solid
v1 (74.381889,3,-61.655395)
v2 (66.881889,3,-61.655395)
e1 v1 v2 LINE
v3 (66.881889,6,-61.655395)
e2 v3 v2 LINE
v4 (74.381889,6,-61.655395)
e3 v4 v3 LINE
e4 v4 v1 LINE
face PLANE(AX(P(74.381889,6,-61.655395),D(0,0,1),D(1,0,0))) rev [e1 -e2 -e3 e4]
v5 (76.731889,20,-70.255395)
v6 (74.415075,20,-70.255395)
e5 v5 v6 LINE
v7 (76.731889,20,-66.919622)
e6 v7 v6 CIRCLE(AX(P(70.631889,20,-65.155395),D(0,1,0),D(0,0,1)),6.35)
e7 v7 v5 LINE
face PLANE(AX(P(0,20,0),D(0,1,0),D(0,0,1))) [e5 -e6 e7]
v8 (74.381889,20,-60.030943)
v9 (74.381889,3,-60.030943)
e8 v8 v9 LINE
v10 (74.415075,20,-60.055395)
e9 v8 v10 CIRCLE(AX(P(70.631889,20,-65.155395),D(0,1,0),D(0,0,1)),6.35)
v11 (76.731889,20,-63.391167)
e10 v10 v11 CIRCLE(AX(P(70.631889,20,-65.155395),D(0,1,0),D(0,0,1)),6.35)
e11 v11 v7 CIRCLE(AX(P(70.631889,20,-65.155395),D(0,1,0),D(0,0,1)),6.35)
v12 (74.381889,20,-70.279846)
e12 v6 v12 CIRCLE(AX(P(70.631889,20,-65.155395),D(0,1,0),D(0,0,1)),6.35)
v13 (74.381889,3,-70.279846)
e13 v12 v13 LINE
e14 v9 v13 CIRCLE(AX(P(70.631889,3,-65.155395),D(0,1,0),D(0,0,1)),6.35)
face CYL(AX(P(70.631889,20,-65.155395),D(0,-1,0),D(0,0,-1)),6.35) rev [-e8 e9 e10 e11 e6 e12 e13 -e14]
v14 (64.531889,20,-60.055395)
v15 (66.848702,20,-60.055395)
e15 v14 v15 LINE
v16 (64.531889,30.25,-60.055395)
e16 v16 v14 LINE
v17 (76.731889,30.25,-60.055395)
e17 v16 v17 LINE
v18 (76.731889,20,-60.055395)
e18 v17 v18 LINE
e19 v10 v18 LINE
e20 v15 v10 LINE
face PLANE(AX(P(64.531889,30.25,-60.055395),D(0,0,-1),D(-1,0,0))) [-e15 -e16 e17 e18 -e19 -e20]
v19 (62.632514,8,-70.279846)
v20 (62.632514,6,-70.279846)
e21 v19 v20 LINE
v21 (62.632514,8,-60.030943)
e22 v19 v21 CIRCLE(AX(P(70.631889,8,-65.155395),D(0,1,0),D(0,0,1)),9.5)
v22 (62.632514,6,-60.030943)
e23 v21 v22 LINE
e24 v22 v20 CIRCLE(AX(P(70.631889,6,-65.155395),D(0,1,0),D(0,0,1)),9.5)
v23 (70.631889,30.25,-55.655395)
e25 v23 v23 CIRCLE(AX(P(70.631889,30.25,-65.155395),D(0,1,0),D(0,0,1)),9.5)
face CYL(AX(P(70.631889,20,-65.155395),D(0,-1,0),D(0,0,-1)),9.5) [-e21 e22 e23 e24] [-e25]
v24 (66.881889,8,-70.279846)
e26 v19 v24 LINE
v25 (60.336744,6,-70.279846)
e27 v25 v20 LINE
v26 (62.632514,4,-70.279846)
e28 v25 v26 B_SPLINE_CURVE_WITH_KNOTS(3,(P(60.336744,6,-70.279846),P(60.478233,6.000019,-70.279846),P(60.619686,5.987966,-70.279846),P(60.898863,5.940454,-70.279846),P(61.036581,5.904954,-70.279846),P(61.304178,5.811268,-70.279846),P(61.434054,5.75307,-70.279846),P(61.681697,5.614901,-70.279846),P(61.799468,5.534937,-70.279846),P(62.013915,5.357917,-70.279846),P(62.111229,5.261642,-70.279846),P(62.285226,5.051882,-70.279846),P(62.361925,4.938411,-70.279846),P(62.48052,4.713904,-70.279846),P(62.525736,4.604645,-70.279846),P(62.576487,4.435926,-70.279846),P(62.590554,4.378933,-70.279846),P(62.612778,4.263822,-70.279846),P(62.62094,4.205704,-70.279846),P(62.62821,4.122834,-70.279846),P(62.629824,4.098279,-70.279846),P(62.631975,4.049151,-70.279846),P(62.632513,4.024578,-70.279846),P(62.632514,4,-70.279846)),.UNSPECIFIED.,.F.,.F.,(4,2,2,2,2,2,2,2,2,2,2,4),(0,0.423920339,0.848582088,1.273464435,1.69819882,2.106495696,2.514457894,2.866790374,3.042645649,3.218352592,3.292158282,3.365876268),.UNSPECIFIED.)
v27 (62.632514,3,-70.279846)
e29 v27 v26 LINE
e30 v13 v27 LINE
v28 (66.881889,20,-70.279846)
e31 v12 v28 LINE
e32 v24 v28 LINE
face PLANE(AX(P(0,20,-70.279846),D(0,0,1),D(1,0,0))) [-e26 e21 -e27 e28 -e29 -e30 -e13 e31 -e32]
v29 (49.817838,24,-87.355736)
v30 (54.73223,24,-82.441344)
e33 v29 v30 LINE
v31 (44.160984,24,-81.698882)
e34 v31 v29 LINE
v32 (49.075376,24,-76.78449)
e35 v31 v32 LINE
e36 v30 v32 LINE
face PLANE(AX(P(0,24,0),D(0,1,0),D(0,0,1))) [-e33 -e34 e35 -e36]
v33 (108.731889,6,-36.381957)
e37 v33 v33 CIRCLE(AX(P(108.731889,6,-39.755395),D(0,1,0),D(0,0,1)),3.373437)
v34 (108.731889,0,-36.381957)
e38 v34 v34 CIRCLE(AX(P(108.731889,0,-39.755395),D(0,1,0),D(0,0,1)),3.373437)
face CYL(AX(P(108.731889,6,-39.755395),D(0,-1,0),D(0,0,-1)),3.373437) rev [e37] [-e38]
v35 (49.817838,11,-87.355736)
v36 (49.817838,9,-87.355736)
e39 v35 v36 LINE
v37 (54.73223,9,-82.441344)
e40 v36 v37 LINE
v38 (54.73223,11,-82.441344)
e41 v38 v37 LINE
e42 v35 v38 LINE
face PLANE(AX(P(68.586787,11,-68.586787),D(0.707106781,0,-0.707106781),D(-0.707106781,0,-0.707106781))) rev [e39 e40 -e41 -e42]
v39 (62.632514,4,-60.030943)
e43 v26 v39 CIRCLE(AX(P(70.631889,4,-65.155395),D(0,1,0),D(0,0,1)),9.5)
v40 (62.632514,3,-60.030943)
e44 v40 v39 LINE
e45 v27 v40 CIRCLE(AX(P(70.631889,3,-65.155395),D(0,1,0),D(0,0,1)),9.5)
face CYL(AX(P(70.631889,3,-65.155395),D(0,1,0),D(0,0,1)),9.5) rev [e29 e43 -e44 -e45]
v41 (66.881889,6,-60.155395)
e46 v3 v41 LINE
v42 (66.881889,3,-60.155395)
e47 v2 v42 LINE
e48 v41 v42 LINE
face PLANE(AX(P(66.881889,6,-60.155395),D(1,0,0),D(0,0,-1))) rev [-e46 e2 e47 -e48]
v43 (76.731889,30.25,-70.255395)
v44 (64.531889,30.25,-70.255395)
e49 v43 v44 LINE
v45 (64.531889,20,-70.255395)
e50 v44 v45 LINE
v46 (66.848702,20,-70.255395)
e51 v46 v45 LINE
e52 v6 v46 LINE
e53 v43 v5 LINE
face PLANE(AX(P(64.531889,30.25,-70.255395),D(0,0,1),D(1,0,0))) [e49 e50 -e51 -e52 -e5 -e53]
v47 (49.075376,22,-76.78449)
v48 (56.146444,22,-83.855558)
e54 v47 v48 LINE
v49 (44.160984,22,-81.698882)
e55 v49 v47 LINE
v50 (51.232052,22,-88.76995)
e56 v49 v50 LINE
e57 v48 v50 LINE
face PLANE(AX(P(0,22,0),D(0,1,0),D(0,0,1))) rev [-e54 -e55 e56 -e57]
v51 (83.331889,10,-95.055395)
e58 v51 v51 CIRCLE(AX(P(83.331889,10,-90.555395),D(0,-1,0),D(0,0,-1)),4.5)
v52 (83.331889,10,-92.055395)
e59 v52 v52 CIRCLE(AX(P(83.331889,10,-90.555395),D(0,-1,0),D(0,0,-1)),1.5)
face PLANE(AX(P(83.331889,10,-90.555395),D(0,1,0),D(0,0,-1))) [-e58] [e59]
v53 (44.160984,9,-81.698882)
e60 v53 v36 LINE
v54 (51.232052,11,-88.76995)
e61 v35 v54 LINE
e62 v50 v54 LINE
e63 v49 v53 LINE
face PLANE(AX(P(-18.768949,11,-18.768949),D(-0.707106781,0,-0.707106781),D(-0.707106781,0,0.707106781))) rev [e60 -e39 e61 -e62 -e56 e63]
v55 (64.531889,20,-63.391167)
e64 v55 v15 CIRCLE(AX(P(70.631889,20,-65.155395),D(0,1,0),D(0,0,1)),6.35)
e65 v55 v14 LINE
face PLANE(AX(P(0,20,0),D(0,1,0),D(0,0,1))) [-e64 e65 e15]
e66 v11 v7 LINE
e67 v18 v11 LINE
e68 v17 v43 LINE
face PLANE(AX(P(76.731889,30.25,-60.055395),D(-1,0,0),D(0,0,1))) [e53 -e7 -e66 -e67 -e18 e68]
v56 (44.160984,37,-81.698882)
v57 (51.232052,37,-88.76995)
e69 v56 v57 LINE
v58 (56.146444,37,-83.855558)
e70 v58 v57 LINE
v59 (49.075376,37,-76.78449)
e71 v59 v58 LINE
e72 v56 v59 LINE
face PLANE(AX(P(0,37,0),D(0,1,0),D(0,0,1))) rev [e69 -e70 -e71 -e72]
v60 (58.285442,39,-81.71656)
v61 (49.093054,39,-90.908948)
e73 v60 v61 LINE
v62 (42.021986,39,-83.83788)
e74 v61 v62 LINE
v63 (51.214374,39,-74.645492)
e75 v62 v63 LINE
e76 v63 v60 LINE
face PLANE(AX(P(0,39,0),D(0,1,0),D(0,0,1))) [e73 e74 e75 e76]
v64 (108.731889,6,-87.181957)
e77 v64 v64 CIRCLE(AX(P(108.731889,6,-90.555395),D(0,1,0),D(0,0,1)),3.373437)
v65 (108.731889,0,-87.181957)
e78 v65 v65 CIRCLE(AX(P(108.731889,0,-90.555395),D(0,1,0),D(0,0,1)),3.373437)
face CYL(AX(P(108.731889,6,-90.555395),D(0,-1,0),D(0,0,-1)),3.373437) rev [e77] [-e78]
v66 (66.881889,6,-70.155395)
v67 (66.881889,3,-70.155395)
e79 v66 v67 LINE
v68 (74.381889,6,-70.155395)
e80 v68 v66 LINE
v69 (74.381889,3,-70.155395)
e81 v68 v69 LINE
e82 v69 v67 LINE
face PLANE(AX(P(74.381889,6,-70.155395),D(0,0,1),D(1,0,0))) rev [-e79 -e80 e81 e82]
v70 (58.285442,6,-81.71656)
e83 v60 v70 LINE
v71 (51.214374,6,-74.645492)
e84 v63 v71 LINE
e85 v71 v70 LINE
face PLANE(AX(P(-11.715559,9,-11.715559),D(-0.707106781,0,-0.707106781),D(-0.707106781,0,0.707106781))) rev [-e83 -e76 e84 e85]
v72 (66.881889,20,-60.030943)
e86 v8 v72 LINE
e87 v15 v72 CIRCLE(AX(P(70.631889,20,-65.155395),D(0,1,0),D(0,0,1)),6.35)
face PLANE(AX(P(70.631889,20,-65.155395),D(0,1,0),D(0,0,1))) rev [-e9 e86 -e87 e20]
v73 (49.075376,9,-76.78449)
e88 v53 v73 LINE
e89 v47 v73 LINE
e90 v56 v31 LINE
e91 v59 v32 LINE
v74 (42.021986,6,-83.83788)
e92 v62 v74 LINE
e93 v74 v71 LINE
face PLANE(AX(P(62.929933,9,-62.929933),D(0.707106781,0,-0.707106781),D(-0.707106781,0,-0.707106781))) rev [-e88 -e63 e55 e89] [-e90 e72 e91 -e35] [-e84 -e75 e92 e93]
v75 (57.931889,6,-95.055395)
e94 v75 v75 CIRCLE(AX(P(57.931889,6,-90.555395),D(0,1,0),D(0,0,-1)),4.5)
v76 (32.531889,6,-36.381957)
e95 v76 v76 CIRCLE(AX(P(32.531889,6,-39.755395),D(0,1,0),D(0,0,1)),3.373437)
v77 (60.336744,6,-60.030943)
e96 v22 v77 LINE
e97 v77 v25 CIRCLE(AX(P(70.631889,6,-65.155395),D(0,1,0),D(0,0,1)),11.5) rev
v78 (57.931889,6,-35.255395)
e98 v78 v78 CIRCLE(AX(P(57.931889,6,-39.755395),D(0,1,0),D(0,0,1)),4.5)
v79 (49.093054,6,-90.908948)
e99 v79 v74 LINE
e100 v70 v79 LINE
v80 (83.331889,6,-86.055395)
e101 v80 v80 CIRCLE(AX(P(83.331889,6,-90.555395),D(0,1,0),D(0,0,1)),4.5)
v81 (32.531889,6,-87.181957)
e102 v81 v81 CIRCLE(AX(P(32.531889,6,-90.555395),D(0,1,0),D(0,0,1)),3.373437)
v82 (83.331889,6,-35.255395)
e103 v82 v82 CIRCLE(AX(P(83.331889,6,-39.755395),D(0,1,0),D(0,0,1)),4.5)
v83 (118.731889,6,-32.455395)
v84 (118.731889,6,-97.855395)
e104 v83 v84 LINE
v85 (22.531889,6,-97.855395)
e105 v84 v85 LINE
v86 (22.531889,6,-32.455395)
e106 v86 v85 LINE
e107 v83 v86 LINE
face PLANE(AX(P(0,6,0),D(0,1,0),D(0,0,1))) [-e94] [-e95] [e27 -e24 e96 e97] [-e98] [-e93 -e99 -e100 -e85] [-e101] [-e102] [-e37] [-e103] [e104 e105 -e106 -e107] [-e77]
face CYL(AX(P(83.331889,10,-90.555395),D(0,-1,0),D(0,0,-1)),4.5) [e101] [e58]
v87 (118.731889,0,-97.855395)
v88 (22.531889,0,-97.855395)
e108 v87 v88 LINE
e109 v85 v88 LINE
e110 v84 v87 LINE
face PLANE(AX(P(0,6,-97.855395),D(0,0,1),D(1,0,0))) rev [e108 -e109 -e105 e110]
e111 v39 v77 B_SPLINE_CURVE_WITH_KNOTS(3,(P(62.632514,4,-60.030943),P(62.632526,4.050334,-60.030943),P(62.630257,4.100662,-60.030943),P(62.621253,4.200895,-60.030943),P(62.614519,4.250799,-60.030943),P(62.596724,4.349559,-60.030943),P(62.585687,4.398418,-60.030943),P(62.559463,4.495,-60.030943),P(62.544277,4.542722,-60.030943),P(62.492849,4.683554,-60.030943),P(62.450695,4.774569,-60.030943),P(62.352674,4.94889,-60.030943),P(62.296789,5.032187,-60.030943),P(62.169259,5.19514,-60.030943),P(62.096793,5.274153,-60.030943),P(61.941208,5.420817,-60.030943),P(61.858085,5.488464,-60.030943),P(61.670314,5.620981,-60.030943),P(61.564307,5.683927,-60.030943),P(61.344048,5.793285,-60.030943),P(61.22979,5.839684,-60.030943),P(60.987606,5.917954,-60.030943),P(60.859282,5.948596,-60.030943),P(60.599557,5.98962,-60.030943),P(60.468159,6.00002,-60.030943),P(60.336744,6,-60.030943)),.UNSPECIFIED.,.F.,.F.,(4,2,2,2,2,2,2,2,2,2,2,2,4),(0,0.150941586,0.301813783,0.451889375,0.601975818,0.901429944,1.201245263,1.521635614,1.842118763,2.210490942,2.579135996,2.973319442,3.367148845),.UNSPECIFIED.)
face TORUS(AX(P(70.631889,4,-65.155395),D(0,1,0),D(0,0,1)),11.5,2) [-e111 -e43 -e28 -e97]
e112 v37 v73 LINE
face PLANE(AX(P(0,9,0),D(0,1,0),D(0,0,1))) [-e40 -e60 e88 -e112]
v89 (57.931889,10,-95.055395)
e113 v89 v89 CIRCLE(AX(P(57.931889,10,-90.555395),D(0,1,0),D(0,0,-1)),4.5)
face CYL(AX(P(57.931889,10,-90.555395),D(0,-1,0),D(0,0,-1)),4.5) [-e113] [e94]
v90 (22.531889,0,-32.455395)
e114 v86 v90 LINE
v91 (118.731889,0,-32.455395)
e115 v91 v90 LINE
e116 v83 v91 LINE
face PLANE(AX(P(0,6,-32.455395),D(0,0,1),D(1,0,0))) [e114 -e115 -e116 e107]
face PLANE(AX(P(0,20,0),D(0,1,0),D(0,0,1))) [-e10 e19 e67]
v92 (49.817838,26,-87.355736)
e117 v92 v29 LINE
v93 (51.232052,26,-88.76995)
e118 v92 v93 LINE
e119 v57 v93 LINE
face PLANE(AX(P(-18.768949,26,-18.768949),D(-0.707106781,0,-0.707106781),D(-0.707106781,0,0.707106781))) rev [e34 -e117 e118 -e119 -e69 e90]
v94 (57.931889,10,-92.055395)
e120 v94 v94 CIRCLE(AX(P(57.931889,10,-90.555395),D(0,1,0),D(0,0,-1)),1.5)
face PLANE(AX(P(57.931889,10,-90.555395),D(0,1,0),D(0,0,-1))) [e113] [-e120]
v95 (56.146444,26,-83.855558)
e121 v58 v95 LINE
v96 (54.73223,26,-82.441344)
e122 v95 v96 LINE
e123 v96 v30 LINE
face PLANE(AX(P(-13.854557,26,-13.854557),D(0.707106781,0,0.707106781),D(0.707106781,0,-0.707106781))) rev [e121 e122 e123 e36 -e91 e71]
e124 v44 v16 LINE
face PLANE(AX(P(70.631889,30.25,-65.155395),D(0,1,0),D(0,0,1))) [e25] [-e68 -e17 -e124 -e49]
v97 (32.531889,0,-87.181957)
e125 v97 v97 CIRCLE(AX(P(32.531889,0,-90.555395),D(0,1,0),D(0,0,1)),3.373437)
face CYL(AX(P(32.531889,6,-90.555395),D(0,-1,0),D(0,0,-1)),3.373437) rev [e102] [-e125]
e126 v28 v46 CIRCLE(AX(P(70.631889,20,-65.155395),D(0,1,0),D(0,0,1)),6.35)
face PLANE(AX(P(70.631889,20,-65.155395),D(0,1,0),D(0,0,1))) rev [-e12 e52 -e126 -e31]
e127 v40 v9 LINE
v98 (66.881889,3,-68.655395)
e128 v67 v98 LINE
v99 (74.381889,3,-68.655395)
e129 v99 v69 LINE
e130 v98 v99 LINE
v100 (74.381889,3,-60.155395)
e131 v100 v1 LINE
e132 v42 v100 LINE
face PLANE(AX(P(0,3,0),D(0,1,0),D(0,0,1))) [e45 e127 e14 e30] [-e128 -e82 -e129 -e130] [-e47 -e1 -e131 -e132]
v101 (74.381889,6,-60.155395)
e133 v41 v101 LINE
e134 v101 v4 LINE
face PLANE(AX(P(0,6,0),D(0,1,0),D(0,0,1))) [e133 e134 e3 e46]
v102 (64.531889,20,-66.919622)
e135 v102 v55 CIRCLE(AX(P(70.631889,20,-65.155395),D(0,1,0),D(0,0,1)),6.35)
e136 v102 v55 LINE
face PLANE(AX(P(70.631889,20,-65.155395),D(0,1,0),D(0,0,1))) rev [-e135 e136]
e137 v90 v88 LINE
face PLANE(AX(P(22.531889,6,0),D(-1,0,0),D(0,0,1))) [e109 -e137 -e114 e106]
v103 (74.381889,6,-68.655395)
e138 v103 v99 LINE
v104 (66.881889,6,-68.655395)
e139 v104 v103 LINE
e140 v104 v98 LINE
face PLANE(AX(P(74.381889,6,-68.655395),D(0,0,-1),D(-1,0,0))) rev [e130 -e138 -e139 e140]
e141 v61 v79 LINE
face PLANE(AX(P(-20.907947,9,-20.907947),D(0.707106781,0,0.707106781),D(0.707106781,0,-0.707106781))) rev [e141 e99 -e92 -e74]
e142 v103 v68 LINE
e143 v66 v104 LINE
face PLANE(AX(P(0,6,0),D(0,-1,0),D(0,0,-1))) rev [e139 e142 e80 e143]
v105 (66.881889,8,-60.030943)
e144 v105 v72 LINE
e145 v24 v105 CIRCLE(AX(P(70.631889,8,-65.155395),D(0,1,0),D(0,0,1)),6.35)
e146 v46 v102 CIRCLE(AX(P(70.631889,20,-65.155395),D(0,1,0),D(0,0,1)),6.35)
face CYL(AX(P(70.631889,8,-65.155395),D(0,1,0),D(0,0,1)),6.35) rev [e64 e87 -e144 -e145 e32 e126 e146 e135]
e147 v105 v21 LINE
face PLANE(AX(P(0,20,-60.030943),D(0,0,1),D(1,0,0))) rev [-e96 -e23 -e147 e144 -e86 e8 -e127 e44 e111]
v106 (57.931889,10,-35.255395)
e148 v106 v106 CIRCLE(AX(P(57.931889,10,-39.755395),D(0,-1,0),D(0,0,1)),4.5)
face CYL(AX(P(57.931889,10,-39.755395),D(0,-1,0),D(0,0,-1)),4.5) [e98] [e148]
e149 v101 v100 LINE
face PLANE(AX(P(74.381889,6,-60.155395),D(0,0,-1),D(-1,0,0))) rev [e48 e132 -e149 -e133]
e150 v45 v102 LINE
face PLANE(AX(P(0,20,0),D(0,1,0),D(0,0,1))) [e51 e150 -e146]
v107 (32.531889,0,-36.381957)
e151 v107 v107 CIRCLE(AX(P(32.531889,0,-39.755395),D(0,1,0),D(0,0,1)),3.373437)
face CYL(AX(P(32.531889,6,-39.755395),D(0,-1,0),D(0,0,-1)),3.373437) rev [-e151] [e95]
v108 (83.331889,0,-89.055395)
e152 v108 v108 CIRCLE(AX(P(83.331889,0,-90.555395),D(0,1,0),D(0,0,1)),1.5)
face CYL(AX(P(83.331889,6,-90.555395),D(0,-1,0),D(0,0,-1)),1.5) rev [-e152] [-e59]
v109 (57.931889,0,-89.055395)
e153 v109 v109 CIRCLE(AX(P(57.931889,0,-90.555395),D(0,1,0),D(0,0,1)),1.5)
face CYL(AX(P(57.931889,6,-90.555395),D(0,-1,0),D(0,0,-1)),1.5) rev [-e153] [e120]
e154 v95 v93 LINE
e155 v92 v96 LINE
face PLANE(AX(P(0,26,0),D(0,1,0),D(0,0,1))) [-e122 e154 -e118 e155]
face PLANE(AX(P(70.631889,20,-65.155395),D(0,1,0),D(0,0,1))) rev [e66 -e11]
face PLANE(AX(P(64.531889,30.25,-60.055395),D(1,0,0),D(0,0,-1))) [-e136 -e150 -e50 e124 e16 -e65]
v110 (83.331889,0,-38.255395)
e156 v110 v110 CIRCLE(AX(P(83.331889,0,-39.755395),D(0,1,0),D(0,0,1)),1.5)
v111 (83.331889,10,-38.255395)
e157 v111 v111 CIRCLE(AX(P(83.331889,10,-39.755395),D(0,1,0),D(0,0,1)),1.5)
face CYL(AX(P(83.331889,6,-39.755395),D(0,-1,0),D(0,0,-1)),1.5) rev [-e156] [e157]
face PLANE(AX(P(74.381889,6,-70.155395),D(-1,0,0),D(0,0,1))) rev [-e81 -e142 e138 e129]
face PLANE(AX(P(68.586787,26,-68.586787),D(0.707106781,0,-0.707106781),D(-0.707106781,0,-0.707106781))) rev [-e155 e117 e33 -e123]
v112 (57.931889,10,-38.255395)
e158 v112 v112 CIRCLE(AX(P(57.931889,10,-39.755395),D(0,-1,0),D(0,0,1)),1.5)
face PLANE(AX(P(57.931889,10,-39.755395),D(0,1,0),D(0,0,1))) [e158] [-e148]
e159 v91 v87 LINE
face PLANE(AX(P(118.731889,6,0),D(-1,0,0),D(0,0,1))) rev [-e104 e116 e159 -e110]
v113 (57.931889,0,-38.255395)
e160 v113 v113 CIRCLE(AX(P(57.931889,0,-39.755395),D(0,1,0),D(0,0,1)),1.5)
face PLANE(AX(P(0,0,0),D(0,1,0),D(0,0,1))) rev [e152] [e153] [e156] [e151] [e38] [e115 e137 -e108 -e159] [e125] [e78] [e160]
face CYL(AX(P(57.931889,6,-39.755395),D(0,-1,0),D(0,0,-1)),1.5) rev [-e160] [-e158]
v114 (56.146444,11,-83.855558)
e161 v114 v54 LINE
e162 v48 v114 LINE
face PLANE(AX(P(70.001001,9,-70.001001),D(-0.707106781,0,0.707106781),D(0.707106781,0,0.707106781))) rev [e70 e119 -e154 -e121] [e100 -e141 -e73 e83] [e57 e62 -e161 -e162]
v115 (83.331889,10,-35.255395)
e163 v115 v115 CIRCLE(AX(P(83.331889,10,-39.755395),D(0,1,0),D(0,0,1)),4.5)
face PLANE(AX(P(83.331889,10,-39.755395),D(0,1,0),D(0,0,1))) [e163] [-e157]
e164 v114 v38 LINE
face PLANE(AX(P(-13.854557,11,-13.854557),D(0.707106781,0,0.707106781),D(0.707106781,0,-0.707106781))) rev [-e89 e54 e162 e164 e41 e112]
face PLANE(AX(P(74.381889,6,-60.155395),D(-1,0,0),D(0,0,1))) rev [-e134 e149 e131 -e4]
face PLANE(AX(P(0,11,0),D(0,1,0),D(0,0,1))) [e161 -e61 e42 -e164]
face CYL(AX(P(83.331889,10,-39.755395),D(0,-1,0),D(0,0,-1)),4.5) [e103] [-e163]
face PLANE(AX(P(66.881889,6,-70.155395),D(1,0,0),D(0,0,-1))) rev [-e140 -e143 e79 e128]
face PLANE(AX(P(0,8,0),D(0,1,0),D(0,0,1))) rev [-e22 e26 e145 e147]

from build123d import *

# Parameters (mm, degrees)
SKETCH2_R                 = 1.5000000000000042
SKETCH2_R_2               = 1.4999999999999973
SKETCH2_R_3               = 3.37343749999996
BOSS_EXTRUDE1_DEPTH       = 6
SKETCH3_R                 = 4.500000000000005
SKETCH3_R_2               = 1.4999999999999973
BOSS_EXTRUDE2_DEPTH       = 4
MIRROR2_COPY_1_SKETCH_R   = 4.500000000000005
MIRROR2_COPY_1_SKETCH_R_2 = 1.4999999999999973
MIRROR2_COPY_1_DEPTH      = 4
BOSS_EXTRUDE3_DEPTH       = 14
CUT_EXTRUDE2_START        = -3
CUT_EXTRUDE2_DEPTH        = 3
SKETCH8_W                 = 7.5
SKETCH8_H                 = 1.5
BOSS_EXTRUDE4_DEPTH       = 3
BOSS_EXTRUDE5_START       = -12.000000000000004
BOSS_EXTRUDE5_DEPTH       = 12.000000000000004
SKETCH10_R                = 9.499999999999993
SKETCH10_W                = 12.200000000000003
SKETCH10_H                = 10.200000000000003
BOSS_EXTRUDE6_DEPTH       = 10.25
FILLET1_R                 = 2
BOSS_EXTRUDE7_DEPTH       = 3
BOSS_EXTRUDE8_DEPTH       = 2
BOSS_EXTRUDE9_DEPTH       = 11
BOSS_EXTRUDE10_DEPTH      = 2
BOSS_EXTRUDE11_DEPTH      = 2
BOSS_EXTRUDE12_DEPTH      = 11
BOSS_EXTRUDE13_DEPTH      = 2


with BuildPart() as part:
    # Sketch2 → Boss-Extrude1 (new body)
    with BuildSketch(Plane(origin=(0, 0, 0), x_dir=(1, 0, 0), z_dir=(0, 1, 0))):
        Polygon((118.7318886716207, 32.455394598369764), (118.73188867162068, 97.85539459836978), (22.531888671620678, 97.85539459836976), (22.5318886716207, 32.45539459836975), align=None)
        with Locations(Location((57.93188867162069, 39.75539459836976, 0), (0, 0, 270))):
            Circle(SKETCH2_R, mode=Mode.SUBTRACT)
        with Locations(Location((83.3318886716207, 39.75539459836976, 0), (0, 0, 270))):
            Circle(SKETCH2_R_2, mode=Mode.SUBTRACT)
        with Locations(Location((57.931888671620705, 90.55539459836976, 0), (0, 0, 270))):
            Circle(SKETCH2_R_2, mode=Mode.SUBTRACT)
        with Locations(Location((83.3318886716207, 90.55539459836974, 0), (0, 0, 270))):
            Circle(SKETCH2_R_2, mode=Mode.SUBTRACT)
        with Locations(Location((108.7318886716207, 90.55539459836974, 0), (0, 0, 270))):
            Circle(SKETCH2_R_3, mode=Mode.SUBTRACT)
        with Locations(Location((108.73188867162068, 39.755394598369776, 0), (0, 0, 270))):
            Circle(SKETCH2_R_3, mode=Mode.SUBTRACT)
        with Locations(Location((32.53188867162068, 90.55539459836974, 0), (0, 0, 270))):
            Circle(SKETCH2_R_3, mode=Mode.SUBTRACT)
        with Locations(Location((32.53188867162071, 39.755394598369755, 0), (0, 0, 270))):
            Circle(SKETCH2_R_3, mode=Mode.SUBTRACT)
    extrude(amount=BOSS_EXTRUDE1_DEPTH)

    # Sketch3 → Boss-Extrude2 (add)
    with BuildSketch(Plane(origin=(0, 6, 0), x_dir=(1, 0, 0), z_dir=(0, 1, 0))):
        with Locations(Location((83.3318886716207, 39.75539459836976, 0), (0, 0, 270))):
            Circle(SKETCH3_R)
        with Locations(Location((83.3318886716207, 39.75539459836976, 0), (0, 0, 270))):
            Circle(SKETCH3_R_2, mode=Mode.SUBTRACT)
    boss_extrude2 = extrude(amount=BOSS_EXTRUDE2_DEPTH)

    # Mirror1: Boss-Extrude2 across plane
    add(boss_extrude2.mirror(Plane.ZY.offset(-70.6318886716207)))

    # Mirror2: Boss-Extrude2 across plane
    add(boss_extrude2.mirror(Plane(origin=(-1.41e-14, 0, -65.15539459836975), x_dir=(1, 0, -1e-16), z_dir=(-1e-16, 0, -1))))

    # Mirror2 copy 1 sketch → Mirror2 copy 1 (add)
    with BuildSketch(Plane(origin=(141.2637773432414, 6, -130.31078919673953), x_dir=(-1, 0, 2.1e-16), z_dir=(0, 1, 0))):
        with Locations(Location((83.3318886716207, 39.75539459836976, 0), (0, 0, 270))):
            Circle(MIRROR2_COPY_1_SKETCH_R)
        with Locations(Location((83.3318886716207, 39.75539459836976, 0), (0, 0, 270))):
            Circle(MIRROR2_COPY_1_SKETCH_R_2, mode=Mode.SUBTRACT)
    extrude(amount=MIRROR2_COPY_1_DEPTH)

    # Sketch6 → Boss-Extrude3 (add)
    with BuildSketch(Plane(origin=(0, 6, 0), x_dir=(1, 0, 0), z_dir=(0, 1, 0))):
        with BuildLine():
            Line((66.88188867162067, 70.27984578849734), (74.38188867162069, 70.27984578849734))
            ThreePointArc((74.38188867162069, 70.27984578849734), (70.63188867162069, 71.50539459836976), (66.88188867162067, 70.27984578849734))
        make_face()
        with BuildLine():
            ThreePointArc((66.88188867162067, 70.27984578849734), (70.63188867162069, 71.50539459836976), (74.38188867162069, 70.27984578849734))
            ThreePointArc((74.38188867162069, 70.27984578849734), (76.29470599164787, 68.02854617808148), (76.98188867162068, 65.15539459836977))
            ThreePointArc((76.98188867162068, 65.15539459836977), (76.29470599164787, 62.282243018658036), (74.38188867162067, 60.03094340824218))
            ThreePointArc((74.38188867162067, 60.03094340824218), (70.63188867162069, 58.80539459836977), (66.88188867162069, 60.03094340824219))
            Line((66.88188867162069, 60.03094340824217), (62.63251369603666, 60.03094340824217))
            ThreePointArc((62.63251369603667, 60.03094340824218), (73.30171429625909, 56.038266150551124), (80.13188867162069, 65.15539459836977))
            ThreePointArc((80.13188867162069, 65.15539459836977), (73.30171429625909, 74.27252304618841), (62.63251369603665, 70.27984578849734))
            Line((62.632513696036646, 70.27984578849734), (66.88188867162067, 70.27984578849734))
        make_face()
        with BuildLine():
            Line((74.38188867162069, 60.03094340824217), (66.88188867162069, 60.03094340824217))
            ThreePointArc((66.88188867162069, 60.03094340824219), (70.63188867162069, 58.80539459836977), (74.38188867162067, 60.03094340824218))
        make_face()
    extrude(amount=BOSS_EXTRUDE3_DEPTH)

    # Sketch12 → Cut-Extrude2 (cut)
    with BuildSketch(Plane(origin=(0, 6, 0), x_dir=(1, 0, 0), z_dir=(0, 1, 0)).offset(CUT_EXTRUDE2_START)):
        with BuildLine():
            Line((62.63251369603666, 60.03094340824217), (66.88188867162044, 60.03094340824217))
            ThreePointArc((66.88188867162049, 60.03094340824234), (64.28188867162069, 65.15539459836975), (66.88188867162047, 70.27984578849718))
            Line((66.88188867162042, 70.27984578849734), (62.632513696036646, 70.27984578849734))
            ThreePointArc((62.63251369603664, 70.27984578849734), (61.13188867162067, 65.15539459836975), (62.63251369603665, 60.030943408242166))
        make_face()
        with BuildLine():
            Line((66.88188867162044, 60.03094340824217), (74.38188867162069, 60.03094340824218))
            ThreePointArc((74.38188867162069, 60.03094340824219), (76.29470599164789, 62.282243018658036), (76.9818886716207, 65.15539459836977))
            ThreePointArc((76.9818886716207, 65.15539459836977), (76.29470599164789, 68.0285461780815), (74.38188867162069, 70.27984578849734))
            Line((74.38188867162069, 70.27984578849734), (66.88188867162042, 70.27984578849734))
            ThreePointArc((66.88188867162047, 70.27984578849718), (64.28188867162069, 65.15539459836975), (66.88188867162049, 60.03094340824234))
        make_face()
    extrude(amount=CUT_EXTRUDE2_DEPTH, mode=Mode.SUBTRACT)

    # Sketch8 → Boss-Extrude4 (add)
    with BuildSketch(Plane(origin=(0, 3, 0), x_dir=(1, 0, 0), z_dir=(0, 1, 0))):
        with Locations((70.63188867162069, 69.40539459836977)):
            Rectangle(SKETCH8_W, SKETCH8_H)
        with Locations((70.63188867162069, 60.90539459836977)):
            Rectangle(SKETCH8_W, SKETCH8_H)
    extrude(amount=BOSS_EXTRUDE4_DEPTH)

    # Sketch9 → Boss-Extrude5 (add)
    with BuildSketch(Plane(origin=(0, 20, 0), x_dir=(1, 0, 0), z_dir=(0, 1, 0)).offset(BOSS_EXTRUDE5_START)):
        with BuildLine():
            ThreePointArc((80.1318886716207, 65.15539459836977), (73.30171429625909, 74.27252304618843), (62.632513696036646, 70.27984578849735))
            Line((62.632513696036646, 70.27984578849734), (66.88188867162042, 70.27984578849734))
            ThreePointArc((66.88188867162047, 70.27984578849718), (70.63188867162056, 71.50539459836976), (74.38188867162069, 70.27984578849734))
            ThreePointArc((74.38188867162069, 70.27984578849734), (76.29470599164787, 68.02854617808148), (76.98188867162068, 65.15539459836977))
            ThreePointArc((76.98188867162068, 65.15539459836977), (76.29470599164787, 62.282243018658036), (74.38188867162069, 60.03094340824219))
            ThreePointArc((74.38188867162069, 60.03094340824219), (70.63188867162056, 58.80539459836977), (66.88188867162049, 60.03094340824234))
            Line((66.88188867162044, 60.03094340824217), (62.63251369603666, 60.03094340824217))
            ThreePointArc((62.63251369603665, 60.030943408242166), (73.3017142962591, 56.03826615055111), (80.1318886716207, 65.15539459836977))
        make_face()
        with BuildLine():
            Line((66.88188867162042, 70.27984578849734), (62.632513696036646, 70.27984578849734))
            ThreePointArc((62.632513696036646, 70.27984578849735), (61.13188867162067, 65.15539459836975), (62.63251369603665, 60.030943408242166))
            Line((62.63251369603666, 60.03094340824217), (66.88188867162044, 60.03094340824217))
            ThreePointArc((66.88188867162049, 60.03094340824234), (64.28188867162069, 65.15539459836975), (66.88188867162047, 70.27984578849718))
        make_face()
    extrude(amount=BOSS_EXTRUDE5_DEPTH)

    # Sketch10 → Boss-Extrude6 (add)
    with BuildSketch(Plane(origin=(0, 20, 0), x_dir=(1, 0, 0), z_dir=(0, 1, 0))):
        with Locations(Location((70.63188867162069, 65.15539459836977, 0), (0, 0, 147.35611352))):
            Circle(SKETCH10_R)
        with Locations((70.63188867162069, 65.15539459836975)):
            Rectangle(SKETCH10_W, SKETCH10_H, mode=Mode.SUBTRACT)
    extrude(amount=BOSS_EXTRUDE6_DEPTH)

    # Fillet1
    # the kernel refuses this fillet: 2 mm, written as the material it takes off along each edge
    with BuildSketch(Plane(origin=(70.63188867162066, 6, -65.15539459836977), x_dir=(-0.45700581372795496, 0, -0.8894637070835716), z_dir=(0.8894637070835716, 0, -0.45700581372795496))) as fillet1_piece_1_section:
        with BuildLine():
            CenterArc((9.500000000000403 + FILLET1_R, -FILLET1_R), FILLET1_R, 90, 90)
            Line((9.500000000000403, -FILLET1_R), (9.500000000000403, 0))
            Line((9.500000000000403, 0), (9.500000000000403 + FILLET1_R, 0))
        make_face()
    fillet1_piece_1 = revolve(axis=Axis((70.63188867162066, 6, -65.15539459836977), (0, 1, 0)), revolution_arc=125.61186747806521, mode=Mode.PRIVATE)
    fillet1_piece_1 = split(fillet1_piece_1, bisect_by=Plane(origin=(60.560942859837816, 5.429054188217563, -70.27984578849734), z_dir=(0, 0, 1)), keep=Keep.TOP, mode=Mode.PRIVATE)
    fillet1_piece_1 = split(fillet1_piece_1, bisect_by=Plane(origin=(60.560942859837816, 5.429054188217563, -60.03094340824217), z_dir=(0, 0, -1)), keep=Keep.TOP, mode=Mode.PRIVATE)
    add(fillet1_piece_1, mode=Mode.SUBTRACT)

    # Sketch13 → Boss-Extrude7 (add)
    with BuildSketch(Plane(origin=(0, 6, 0), x_dir=(1, 0, 0), z_dir=(0, 1, 0))):
        Polygon((51.21437425034851, 74.64549202167245), (58.285442062214, 81.71655983353793), (49.0930539067889, 90.90894798896305), (42.0219860949234, 83.83788017709759), align=None)
    extrude(amount=BOSS_EXTRUDE7_DEPTH)

    # Sketch14 → Boss-Extrude8 (add)
    with BuildSketch(Plane(origin=(0, 9.000000000000002, 0), x_dir=(1, 0, 0), z_dir=(0, 1, 0))):
        Polygon((42.0219860949234, 83.83788017709759), (44.160984108012705, 81.69888216400828), (49.817838357505074, 87.35573641350065), (54.73223048675158, 82.44134428425414), (49.07537623725921, 76.78449003476177), (51.21437425034851, 74.64549202167245), (58.285442062213995, 81.71655983353793), (49.0930539067889, 90.90894798896305), align=None)
    extrude(amount=BOSS_EXTRUDE8_DEPTH)

    # Sketch15 → Boss-Extrude9 (add)
    with BuildSketch(Plane(origin=(0, 11.000000000000002, 0), x_dir=(1, 0, 0), z_dir=(0, 1, 0))):
        Polygon((44.16098410801271, 81.69888216400828), (49.81783835750507, 87.35573641350065), (51.2320519198782, 88.76994997587377), (49.09305390678893, 90.90894798896306), (42.0219860949234, 83.83788017709759), align=None)
        Polygon((56.14644404912469, 83.85555784662725), (54.732230486751575, 82.44134428425414), (49.0753762372592, 76.78449003476176), (51.21437425034851, 74.64549202167245), (58.285442062213995, 81.71655983353793), align=None)
    extrude(amount=BOSS_EXTRUDE9_DEPTH)

    # Sketch16 → Boss-Extrude10 (add)
    with BuildSketch(Plane(origin=(0, 22, 0), x_dir=(1, 0, 0), z_dir=(0, 1, 0))):
        Polygon((42.0219860949234, 83.83788017709759), (51.21437425034852, 74.64549202167245), (58.285442062213995, 81.71655983353793), (49.093053906788946, 90.90894798896309), align=None)
    extrude(amount=BOSS_EXTRUDE10_DEPTH)

    # Sketch17 → Boss-Extrude11 (add)
    with BuildSketch(Plane(origin=(0, 24, 0), x_dir=(1, 0, 0), z_dir=(0, 1, 0))):
        Polygon((49.81783835750507, 87.35573641350065), (54.732230486751575, 82.44134428425414), (49.0753762372592, 76.78449003476176), (51.21437425034852, 74.64549202167245), (58.285442062213995, 81.71655983353793), (49.093053906788946, 90.90894798896309), (42.0219860949234, 83.83788017709759), (44.160984108012705, 81.69888216400828), align=None)
    extrude(amount=BOSS_EXTRUDE11_DEPTH)

    # Sketch18 → Boss-Extrude12 (add)
    with BuildSketch(Plane(origin=(0, 26.000000000000004, 0), x_dir=(1, 0, 0), z_dir=(0, 1, 0))):
        Polygon((44.16098410801272, 81.69888216400828), (49.81783835750507, 87.35573641350065), (51.23205191987821, 88.76994997587379), (49.093053906788946, 90.90894798896306), (42.0219860949234, 83.83788017709759), align=None)
        Polygon((56.146444049124675, 83.85555784662725), (54.73223048675157, 82.44134428425414), (49.07537623725922, 76.78449003476177), (51.21437425034852, 74.64549202167245), (58.285442062213974, 81.71655983353793), align=None)
    extrude(amount=BOSS_EXTRUDE12_DEPTH)

    # Sketch19 → Boss-Extrude13 (add)
    with BuildSketch(Plane(origin=(0, 37.00000000000001, 0), x_dir=(1, 0, 0), z_dir=(0, 1, 0))):
        Polygon((42.0219860949234, 83.83788017709759), (51.214374250348534, 74.64549202167247), (58.285442062213946, 81.71655983353793), (49.09305390678893, 90.90894798896309), align=None)
    extrude(amount=BOSS_EXTRUDE13_DEPTH)


solid = part.part
